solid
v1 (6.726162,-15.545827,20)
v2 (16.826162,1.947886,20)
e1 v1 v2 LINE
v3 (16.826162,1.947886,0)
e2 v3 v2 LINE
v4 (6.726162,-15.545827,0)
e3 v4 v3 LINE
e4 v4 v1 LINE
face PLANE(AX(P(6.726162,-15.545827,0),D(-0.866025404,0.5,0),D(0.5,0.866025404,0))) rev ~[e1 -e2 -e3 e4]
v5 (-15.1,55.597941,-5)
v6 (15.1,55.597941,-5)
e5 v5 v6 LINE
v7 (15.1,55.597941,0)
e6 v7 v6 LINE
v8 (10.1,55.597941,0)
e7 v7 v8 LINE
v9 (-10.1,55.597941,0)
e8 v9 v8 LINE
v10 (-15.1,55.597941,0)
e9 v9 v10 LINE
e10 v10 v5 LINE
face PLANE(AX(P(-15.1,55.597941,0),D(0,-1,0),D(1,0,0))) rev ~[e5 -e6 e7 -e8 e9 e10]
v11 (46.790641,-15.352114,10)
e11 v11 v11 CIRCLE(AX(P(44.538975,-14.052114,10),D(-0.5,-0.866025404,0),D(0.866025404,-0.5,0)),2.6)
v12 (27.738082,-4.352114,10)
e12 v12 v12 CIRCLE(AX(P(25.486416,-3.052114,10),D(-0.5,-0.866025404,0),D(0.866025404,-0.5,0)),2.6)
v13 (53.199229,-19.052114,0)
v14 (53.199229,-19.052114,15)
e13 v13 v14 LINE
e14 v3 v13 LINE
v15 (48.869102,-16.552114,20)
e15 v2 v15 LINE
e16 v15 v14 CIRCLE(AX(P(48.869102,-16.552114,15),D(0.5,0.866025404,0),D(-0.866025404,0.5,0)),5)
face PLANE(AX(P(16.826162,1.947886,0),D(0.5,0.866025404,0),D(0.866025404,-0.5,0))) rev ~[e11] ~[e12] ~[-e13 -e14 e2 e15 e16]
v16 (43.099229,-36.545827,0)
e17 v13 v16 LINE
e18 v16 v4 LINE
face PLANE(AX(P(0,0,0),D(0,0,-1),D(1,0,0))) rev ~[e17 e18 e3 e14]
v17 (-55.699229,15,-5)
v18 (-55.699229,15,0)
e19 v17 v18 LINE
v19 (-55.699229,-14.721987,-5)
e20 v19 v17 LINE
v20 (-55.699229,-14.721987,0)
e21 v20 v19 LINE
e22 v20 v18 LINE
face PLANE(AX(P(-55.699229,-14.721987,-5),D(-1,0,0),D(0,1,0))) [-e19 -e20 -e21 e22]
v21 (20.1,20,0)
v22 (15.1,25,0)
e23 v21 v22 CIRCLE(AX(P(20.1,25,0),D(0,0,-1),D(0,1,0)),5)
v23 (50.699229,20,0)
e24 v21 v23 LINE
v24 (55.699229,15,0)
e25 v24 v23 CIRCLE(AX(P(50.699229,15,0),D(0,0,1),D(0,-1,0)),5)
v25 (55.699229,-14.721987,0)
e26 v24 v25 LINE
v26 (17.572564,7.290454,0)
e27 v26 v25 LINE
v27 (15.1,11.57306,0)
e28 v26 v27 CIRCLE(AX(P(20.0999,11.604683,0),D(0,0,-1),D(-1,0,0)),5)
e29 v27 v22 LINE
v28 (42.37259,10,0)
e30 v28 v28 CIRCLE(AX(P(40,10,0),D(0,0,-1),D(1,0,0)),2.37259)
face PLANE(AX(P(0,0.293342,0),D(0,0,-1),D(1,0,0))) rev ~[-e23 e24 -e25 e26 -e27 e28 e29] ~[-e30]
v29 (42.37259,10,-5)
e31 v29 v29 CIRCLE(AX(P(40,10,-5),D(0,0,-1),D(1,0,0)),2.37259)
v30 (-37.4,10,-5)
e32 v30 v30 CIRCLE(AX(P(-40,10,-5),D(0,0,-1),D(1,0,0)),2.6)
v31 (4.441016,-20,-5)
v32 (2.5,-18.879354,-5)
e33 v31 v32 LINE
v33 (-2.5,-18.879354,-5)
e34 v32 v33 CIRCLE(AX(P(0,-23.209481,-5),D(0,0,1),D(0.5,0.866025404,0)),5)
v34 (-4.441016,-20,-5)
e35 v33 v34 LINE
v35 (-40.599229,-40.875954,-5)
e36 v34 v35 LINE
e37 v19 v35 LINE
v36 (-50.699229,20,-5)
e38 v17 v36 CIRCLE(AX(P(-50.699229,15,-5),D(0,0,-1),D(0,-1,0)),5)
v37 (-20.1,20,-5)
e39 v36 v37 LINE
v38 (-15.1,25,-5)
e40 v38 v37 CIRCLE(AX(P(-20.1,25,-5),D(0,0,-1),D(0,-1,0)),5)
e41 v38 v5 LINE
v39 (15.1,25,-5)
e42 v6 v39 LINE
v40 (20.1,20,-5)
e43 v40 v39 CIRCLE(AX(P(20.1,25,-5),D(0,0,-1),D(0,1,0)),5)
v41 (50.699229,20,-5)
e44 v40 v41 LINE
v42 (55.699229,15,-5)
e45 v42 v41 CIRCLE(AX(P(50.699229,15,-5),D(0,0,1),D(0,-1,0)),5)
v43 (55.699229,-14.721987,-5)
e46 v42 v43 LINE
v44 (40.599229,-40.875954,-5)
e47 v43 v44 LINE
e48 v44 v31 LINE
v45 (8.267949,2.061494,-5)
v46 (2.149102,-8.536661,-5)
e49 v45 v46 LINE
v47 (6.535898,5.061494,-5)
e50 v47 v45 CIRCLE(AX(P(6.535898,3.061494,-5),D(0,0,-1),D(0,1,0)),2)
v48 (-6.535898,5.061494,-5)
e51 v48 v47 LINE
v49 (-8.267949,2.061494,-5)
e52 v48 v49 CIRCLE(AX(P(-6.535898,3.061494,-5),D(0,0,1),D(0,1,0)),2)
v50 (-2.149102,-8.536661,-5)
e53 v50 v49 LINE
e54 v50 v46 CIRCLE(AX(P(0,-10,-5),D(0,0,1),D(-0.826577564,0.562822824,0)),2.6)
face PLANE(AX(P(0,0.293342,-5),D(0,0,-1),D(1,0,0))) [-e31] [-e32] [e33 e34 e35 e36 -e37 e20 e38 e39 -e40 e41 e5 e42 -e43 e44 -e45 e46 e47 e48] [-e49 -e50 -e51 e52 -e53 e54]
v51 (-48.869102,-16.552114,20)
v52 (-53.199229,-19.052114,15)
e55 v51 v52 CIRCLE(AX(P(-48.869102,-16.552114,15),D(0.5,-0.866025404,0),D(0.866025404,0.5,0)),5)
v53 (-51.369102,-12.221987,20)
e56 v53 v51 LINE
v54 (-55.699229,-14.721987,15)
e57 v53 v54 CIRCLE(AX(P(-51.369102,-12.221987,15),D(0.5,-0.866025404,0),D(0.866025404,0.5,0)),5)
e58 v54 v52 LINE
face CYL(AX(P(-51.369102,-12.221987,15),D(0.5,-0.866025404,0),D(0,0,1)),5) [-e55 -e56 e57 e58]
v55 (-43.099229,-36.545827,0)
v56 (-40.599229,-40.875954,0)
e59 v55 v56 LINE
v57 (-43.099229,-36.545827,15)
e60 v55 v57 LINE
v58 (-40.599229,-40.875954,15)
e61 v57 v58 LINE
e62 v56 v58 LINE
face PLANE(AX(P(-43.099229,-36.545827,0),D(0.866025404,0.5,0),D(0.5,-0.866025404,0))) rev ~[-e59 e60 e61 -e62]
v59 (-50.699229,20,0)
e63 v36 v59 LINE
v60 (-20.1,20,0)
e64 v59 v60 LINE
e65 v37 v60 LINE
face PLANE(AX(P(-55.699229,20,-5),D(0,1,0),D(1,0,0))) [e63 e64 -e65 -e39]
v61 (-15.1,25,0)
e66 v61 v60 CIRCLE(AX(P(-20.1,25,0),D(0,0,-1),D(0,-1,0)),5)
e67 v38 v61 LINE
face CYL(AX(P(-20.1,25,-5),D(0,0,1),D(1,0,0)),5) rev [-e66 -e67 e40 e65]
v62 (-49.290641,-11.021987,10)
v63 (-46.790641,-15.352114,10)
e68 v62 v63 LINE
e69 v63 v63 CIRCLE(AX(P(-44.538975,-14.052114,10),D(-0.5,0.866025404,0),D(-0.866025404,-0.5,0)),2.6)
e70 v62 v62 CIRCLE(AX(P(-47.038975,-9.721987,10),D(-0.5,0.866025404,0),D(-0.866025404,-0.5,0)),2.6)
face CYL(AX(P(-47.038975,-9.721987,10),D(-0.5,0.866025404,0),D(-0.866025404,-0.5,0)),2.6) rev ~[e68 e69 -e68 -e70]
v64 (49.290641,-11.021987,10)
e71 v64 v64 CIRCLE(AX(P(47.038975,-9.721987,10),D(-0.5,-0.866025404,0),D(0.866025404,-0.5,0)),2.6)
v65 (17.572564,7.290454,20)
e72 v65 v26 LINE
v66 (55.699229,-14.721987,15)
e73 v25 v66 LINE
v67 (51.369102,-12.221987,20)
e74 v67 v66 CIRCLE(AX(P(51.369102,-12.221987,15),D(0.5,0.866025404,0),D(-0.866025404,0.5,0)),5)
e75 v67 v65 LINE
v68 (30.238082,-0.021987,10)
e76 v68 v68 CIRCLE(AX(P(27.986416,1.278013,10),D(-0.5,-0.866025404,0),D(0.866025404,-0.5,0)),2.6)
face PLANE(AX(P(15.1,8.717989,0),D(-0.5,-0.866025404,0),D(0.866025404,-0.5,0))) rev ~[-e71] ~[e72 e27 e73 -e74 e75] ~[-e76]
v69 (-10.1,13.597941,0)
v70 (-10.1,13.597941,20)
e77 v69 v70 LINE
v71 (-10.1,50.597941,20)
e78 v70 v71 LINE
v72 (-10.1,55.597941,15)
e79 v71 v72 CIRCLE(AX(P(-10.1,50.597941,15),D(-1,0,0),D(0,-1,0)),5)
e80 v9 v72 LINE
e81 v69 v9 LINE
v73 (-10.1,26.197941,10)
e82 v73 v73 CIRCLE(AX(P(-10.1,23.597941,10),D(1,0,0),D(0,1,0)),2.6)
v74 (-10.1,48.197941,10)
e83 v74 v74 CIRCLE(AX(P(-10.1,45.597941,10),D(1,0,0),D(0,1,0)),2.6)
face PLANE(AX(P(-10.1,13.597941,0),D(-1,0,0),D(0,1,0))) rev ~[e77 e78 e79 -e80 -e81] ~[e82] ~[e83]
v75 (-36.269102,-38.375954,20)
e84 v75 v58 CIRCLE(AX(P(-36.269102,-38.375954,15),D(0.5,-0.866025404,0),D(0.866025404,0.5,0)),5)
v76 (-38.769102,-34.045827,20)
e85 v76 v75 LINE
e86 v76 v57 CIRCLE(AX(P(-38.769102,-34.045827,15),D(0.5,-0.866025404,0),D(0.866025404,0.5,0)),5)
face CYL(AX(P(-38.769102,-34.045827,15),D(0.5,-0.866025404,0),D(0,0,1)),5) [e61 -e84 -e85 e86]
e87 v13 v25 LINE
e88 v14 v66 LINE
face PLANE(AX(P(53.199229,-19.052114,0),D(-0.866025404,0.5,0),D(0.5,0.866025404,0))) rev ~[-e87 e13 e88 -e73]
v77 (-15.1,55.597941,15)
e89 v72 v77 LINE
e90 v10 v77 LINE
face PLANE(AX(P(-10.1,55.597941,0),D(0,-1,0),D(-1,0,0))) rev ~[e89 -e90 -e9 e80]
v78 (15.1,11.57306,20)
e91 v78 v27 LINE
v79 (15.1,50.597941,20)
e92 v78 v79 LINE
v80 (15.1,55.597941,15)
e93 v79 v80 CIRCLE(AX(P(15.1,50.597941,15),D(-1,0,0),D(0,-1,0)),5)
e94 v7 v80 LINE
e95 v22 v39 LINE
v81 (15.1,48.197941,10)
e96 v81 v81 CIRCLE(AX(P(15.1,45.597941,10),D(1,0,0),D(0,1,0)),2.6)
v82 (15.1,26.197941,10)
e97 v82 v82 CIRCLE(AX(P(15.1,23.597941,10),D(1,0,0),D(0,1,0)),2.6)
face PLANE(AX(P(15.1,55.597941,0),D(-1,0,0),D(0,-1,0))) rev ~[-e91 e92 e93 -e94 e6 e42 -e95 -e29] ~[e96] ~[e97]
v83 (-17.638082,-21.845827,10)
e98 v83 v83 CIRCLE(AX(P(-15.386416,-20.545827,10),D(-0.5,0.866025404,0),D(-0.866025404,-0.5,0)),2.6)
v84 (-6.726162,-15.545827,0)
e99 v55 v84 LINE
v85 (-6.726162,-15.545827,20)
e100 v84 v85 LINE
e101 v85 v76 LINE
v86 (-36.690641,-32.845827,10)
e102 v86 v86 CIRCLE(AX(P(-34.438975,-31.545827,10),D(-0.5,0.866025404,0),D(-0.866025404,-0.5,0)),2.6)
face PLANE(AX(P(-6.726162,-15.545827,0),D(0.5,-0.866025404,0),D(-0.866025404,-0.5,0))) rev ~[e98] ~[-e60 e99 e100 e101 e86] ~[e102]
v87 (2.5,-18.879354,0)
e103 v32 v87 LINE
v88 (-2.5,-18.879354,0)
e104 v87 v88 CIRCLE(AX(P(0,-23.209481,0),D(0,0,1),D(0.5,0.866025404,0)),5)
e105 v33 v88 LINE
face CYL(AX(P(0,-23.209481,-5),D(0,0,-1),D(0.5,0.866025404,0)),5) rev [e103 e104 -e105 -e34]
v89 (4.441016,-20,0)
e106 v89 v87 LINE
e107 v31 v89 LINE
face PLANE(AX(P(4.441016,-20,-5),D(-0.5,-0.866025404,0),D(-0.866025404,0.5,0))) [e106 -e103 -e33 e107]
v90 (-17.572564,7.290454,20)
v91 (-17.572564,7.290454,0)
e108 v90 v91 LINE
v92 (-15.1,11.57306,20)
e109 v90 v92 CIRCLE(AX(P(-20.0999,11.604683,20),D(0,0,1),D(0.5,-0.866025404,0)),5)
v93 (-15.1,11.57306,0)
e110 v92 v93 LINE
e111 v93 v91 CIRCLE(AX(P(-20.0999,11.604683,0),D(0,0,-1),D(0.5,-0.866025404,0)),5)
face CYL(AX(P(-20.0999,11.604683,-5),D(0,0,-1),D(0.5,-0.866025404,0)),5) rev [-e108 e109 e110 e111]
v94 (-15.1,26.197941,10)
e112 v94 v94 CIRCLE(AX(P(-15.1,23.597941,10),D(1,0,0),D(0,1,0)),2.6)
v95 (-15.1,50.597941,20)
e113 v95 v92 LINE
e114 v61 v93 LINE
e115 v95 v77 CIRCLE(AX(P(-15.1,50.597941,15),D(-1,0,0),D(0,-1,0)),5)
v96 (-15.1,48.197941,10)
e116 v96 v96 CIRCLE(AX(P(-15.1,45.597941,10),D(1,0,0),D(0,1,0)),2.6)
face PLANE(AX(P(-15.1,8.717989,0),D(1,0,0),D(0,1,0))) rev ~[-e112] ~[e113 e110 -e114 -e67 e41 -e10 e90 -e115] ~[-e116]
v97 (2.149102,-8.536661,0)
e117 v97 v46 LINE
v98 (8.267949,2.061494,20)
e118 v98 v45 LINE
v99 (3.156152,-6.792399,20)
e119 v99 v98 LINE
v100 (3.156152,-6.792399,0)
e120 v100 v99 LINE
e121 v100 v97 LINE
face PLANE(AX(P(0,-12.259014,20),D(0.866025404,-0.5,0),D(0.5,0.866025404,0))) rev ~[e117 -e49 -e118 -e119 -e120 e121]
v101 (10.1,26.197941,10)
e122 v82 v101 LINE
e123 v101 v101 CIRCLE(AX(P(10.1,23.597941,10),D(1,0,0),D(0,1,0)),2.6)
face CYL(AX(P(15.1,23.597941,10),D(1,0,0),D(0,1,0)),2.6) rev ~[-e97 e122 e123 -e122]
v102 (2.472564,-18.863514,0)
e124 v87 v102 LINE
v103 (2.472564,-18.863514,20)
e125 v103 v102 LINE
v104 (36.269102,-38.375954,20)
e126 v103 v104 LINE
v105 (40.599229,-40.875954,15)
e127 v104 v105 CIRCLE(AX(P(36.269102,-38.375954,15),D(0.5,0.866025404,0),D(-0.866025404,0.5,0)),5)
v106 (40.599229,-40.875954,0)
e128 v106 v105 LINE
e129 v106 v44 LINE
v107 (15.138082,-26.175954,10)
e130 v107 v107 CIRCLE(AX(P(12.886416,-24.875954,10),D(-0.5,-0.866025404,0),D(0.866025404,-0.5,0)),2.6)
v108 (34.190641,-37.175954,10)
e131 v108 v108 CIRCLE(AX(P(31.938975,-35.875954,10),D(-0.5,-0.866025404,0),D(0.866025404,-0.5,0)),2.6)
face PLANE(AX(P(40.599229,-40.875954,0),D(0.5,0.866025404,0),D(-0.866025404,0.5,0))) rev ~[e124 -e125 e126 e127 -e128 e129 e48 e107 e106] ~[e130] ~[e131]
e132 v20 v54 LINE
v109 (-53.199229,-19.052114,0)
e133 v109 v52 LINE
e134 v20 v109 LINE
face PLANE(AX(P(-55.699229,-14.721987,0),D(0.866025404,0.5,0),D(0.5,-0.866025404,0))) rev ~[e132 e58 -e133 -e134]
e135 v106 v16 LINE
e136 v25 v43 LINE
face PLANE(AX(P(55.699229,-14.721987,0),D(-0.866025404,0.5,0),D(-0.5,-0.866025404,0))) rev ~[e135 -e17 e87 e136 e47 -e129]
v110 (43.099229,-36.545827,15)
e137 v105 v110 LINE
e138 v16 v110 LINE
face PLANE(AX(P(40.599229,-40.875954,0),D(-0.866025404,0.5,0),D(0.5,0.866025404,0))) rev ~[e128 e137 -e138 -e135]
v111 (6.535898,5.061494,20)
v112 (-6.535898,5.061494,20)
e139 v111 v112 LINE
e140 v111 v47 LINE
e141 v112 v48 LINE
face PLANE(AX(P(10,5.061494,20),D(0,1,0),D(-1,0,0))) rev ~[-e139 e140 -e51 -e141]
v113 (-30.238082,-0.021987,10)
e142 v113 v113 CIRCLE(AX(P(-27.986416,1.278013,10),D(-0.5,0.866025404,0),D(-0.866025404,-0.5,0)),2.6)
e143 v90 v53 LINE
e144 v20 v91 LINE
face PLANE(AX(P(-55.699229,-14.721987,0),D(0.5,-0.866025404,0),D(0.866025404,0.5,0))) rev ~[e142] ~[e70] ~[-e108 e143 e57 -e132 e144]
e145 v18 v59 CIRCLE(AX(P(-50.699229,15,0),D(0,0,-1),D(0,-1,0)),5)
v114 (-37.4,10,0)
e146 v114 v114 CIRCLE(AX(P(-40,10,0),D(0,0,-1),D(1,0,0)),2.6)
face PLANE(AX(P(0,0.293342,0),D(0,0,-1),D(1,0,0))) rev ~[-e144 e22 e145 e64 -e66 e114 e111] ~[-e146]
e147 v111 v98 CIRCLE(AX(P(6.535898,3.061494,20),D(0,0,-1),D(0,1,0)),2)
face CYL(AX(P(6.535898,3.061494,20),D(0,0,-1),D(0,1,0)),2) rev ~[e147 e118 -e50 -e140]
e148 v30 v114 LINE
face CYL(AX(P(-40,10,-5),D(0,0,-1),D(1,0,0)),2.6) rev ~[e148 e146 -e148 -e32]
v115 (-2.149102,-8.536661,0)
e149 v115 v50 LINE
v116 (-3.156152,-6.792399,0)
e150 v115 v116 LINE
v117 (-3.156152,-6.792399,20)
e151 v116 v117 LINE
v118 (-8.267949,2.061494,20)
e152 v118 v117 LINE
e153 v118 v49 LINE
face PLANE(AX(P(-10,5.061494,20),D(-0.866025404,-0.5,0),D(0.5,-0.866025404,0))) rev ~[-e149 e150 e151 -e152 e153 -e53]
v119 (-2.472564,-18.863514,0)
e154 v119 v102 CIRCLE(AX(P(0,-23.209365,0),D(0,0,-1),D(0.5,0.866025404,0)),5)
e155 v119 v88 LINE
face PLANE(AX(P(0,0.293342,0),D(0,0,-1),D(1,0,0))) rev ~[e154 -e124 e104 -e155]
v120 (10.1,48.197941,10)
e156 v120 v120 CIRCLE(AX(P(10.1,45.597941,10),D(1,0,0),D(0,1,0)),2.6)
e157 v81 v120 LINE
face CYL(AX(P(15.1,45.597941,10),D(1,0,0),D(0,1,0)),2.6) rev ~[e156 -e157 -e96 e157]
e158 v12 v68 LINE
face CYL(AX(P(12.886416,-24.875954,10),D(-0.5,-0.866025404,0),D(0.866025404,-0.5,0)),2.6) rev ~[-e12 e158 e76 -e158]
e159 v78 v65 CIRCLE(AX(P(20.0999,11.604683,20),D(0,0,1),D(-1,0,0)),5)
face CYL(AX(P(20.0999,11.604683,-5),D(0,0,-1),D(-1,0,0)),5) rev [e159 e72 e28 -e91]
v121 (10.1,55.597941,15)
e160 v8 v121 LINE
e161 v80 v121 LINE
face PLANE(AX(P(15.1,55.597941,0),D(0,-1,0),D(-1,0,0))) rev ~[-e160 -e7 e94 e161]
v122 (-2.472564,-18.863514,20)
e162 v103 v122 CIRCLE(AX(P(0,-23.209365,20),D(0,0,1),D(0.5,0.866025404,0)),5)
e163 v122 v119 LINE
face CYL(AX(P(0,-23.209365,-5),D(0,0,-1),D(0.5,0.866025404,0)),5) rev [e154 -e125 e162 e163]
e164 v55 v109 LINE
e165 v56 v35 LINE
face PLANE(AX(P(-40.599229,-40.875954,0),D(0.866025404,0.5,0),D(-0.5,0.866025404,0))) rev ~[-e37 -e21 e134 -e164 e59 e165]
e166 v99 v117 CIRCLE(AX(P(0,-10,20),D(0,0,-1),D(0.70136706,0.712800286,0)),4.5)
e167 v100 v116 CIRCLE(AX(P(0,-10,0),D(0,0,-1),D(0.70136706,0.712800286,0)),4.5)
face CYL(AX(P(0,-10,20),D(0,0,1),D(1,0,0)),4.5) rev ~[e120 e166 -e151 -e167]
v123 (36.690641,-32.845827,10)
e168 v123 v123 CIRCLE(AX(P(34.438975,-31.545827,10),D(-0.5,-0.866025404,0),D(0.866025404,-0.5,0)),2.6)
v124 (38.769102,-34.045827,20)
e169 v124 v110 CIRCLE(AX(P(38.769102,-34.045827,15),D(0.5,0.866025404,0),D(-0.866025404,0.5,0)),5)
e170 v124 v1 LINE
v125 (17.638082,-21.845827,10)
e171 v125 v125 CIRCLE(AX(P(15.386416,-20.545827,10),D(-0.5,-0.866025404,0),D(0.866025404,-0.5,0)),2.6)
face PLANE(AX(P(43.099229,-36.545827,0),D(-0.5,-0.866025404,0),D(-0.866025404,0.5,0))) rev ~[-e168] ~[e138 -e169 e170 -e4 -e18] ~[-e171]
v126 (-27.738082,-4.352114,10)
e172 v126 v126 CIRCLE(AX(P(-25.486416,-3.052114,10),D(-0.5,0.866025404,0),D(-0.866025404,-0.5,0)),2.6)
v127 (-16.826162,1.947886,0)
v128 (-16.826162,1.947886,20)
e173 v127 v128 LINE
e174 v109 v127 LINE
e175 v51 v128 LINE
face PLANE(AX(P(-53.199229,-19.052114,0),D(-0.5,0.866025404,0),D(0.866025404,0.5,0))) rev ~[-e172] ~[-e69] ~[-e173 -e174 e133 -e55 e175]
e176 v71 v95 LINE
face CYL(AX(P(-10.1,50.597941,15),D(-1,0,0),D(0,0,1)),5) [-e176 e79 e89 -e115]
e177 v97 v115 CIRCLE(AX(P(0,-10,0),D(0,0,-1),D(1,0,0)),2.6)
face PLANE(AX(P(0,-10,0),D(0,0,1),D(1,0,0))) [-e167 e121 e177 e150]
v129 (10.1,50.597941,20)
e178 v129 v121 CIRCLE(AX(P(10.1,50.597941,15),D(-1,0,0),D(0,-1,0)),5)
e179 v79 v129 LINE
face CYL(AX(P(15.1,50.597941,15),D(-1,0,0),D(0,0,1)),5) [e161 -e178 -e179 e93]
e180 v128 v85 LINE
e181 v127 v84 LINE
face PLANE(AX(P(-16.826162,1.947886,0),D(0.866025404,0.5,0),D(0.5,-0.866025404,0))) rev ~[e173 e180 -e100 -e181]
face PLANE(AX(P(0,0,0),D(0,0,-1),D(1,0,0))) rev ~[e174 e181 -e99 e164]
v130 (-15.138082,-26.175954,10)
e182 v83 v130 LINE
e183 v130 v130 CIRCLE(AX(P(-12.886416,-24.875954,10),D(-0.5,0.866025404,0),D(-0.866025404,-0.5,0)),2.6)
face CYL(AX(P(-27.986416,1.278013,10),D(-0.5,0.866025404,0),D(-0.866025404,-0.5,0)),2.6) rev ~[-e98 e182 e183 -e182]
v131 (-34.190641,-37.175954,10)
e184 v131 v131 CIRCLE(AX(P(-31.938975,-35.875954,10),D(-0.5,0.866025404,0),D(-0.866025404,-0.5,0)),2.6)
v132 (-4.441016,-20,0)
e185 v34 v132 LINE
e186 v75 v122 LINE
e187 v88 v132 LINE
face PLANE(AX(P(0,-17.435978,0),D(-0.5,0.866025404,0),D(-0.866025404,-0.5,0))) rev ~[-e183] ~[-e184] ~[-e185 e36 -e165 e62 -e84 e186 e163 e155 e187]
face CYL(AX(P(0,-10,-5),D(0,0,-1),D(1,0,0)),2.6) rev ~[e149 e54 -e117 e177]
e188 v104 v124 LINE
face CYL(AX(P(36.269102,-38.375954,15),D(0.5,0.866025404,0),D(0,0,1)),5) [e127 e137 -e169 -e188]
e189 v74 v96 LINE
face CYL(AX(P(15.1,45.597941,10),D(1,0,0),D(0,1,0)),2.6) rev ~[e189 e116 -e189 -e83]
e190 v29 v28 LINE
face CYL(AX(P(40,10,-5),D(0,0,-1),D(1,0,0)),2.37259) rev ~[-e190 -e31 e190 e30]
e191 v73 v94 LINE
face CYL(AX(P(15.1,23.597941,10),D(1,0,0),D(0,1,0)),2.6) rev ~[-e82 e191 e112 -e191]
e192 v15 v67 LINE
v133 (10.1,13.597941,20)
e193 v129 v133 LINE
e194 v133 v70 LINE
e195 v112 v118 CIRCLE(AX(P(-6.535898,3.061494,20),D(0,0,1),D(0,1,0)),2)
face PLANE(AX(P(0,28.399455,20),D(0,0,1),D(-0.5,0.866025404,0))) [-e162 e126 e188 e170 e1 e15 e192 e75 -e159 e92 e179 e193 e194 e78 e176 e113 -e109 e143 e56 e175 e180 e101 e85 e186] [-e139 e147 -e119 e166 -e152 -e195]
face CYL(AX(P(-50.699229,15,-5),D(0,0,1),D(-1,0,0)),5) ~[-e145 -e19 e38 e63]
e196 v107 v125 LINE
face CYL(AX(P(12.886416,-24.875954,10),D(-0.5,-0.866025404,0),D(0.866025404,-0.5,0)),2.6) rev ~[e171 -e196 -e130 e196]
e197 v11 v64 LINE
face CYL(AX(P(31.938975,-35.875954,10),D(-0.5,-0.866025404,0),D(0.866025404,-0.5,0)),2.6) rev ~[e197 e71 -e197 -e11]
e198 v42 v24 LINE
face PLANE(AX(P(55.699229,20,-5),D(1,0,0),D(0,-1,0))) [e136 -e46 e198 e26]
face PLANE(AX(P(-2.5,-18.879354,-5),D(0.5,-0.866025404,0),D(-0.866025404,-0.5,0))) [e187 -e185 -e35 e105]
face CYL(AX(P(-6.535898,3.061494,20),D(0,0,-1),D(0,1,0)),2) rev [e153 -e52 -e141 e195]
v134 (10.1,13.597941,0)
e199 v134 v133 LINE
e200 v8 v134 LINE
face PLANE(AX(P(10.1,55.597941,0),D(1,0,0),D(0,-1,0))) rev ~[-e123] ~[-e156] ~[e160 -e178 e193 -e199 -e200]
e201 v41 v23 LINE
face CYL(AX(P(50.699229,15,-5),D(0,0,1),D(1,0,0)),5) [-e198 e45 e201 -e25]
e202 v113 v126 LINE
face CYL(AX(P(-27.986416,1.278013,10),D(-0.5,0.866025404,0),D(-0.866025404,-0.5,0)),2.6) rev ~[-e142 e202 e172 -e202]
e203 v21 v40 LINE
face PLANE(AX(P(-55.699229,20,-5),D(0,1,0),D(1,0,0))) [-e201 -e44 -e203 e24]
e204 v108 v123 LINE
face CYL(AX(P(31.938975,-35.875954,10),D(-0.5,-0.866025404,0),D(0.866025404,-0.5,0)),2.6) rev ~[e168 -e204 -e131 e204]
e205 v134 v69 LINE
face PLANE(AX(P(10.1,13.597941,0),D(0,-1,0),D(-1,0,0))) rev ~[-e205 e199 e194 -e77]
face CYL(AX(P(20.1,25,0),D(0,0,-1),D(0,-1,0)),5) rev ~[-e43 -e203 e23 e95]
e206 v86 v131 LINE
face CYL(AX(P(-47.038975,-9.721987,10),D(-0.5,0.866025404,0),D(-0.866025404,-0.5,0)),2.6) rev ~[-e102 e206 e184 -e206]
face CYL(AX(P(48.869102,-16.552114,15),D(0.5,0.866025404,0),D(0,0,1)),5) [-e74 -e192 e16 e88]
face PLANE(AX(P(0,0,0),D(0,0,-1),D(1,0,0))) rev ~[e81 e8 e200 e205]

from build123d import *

# Parameters (mm, degrees)
F1_DEPTH    = 20
F2_R        = 2.6
F3_DEPTH    = 50.6016350946
F4_COUNT    = 3
F4_ANGLE    = 240
F6_DEPTH    = 5
F7_T1_DEPTH = 25
F10_DEPTH   = 5
F11_DEPTH   = 25.001
F12_R       = 2
F13_R       = 2.6
F13_R_2     = 2.372590354
F14_DEPTH   = 25.001
F15_R       = 5
F16_R       = 4.5
F17_DEPTH   = 20


# Not quite as in the source:
# - a fillet or chamfer that OpenCascade refuses, or shapes differently, is made with other operations: its cross-section is extruded or revolved along the edge and cut away or added


with BuildPart() as f1:
    # F0 (on Top) → F1 (new body)
    with BuildSketch(Plane.XY):
        Polygon((43.0992290895, -36.5458269543), (6.7261621305, -15.5458269543), (16.8261621305, 1.9478862021), (53.1992290895, -19.0521137979), (55.6992290895, -14.7219867789), (14.8979589003, 8.8346375481), (0, 0), (-0.2020410997, -17.3193296462), (40.5992290895, -40.8759539732), align=None)
    extrude(amount=F1_DEPTH)

    # F2 (on face) → F3 (cut, through all)
    with BuildSketch(Plane(origin=(-7.55, -13.0769835971, 0), x_dir=(0.8660254038, -0.5, 0), z_dir=(-0.5, -0.8660254038, 0))):
        with Locations((45.5979407522, 10)):
            Circle(F2_R)
        with Locations((23.5979407522, 10)):
            Circle(F2_R)
    extrude(amount=-F3_DEPTH, mode=Mode.SUBTRACT)

    # F4: F1 ×3 about axis
    f4_axis = Axis((0, 0, 10), (0, 0, -1))


with BuildPart() as f1_1:
    add(f1.part)
    for i in range(1, F4_COUNT):
        add(f1.part.rotate(f4_axis, i * F4_ANGLE / (F4_COUNT - 1)))

    # F5 (on face) → F6 (join)
    with BuildSketch(Plane(origin=(0, 0, 0), x_dir=(1, 0, 0), z_dir=(0, 0, -1))):
        Polygon((0, 17.4359781295), (-40.5992290895, 40.8759539732), (-55.6992290895, 14.7219867789), (-15.1, -8.7179890648), (-15.1, -55.5979407522), (15.1, -55.5979407522), (15.1, -8.7179890648), (55.6992290895, 14.7219867789), (40.5992290895, 40.8759539732), align=None)
    extrude(amount=F6_DEPTH)

    # F7: fillet of radius 5 on 3 edges, made by hand

    # F7_s2 → F7_t1 (join)
    with BuildSketch(Plane.XY.offset(-5)):
        with BuildLine():
            ThreePointArc((2.5, -18.8792383324), (0, -18.2093653514), (-2.5, -18.8792383324))
            Line((-2.5, -18.8792383324), (-2.55, -18.7926357921))
            ThreePointArc((-2.55, -18.7926357921), (-1.299975, -18.0710489919), (-0.05, -17.3493755891))
            Line((-0.05, -17.3493755891), (0.05, -17.3493755891))
            ThreePointArc((0.05, -17.3493755891), (1.299975, -18.0710489919), (2.55, -18.7926357921))
            Line((2.55, -18.7926357921), (2.5, -18.8792383324))
        make_face()
        with BuildLine():
            ThreePointArc((15.0999, 11.6046826757), (15.7697729811, 9.1046826757), (17.5999, 7.2745556568))
            Line((17.5999, 7.2745556568), (17.5499, 7.1879531164))
            ThreePointArc((17.5499, 7.1879531164), (16.299975, 7.9097131217), (15.05, 8.6313865244))
            Line((15.05, 8.6313865244), (15, 8.7179890648))
            ThreePointArc((15, 8.7179890648), (15, 10.1613358702), (14.9999, 11.6046826757))
            Line((14.9999, 11.6046826757), (15.0999, 11.6046826757))
        make_face()
        with BuildLine():
            ThreePointArc((-17.5999, 7.2745556568), (-15.7697729811, 9.1046826757), (-15.0999, 11.6046826757))
            Line((-15.0999, 11.6046826757), (-14.9999, 11.6046826757))
            ThreePointArc((-14.9999, 11.6046826757), (-15, 10.1613358702), (-15, 8.7179890648))
            Line((-15, 8.7179890648), (-15.05, 8.6313865244))
            ThreePointArc((-15.05, 8.6313865244), (-16.299975, 7.9097131217), (-17.5499, 7.1879531164))
            Line((-17.5499, 7.1879531164), (-17.5999, 7.2745556568))
        make_face()
    extrude(amount=F7_T1_DEPTH)

    # F9 (on face) → F10 (join)
    with BuildSketch(Plane(origin=(0, 0, -5), x_dir=(1, 0, 0), z_dir=(0, 0, -1))):
        with BuildLine():
            Line((-55.6992290895, 14.7219867789), (-55.6992290895, -20))
            Line((-55.6992290895, -20), (55.6992290895, -20))
            Line((55.6992290895, -20), (55.6992290895, 14.7219867789))
            Line((55.6992290895, 14.7219867789), (52.6519667355, 20))
            Line((52.6519667355, 20), (4.4410161514, 20))
            Line((4.4410161514, 20), (2.5, 18.8793538025))
            ThreePointArc((2.5, 18.8793538025), (0, 18.2094808214), (-2.5, 18.8793538025))
            Line((-2.5, 18.8793538025), (-4.4410161514, 20))
            Line((-4.4410161514, 20), (-52.6519667355, 20))
            Line((-52.6519667355, 20), (-55.6992290895, 14.7219867789))
        make_face()
    extrude(amount=-F10_DEPTH)

    # F8 (on face) → F11 (cut, through all)
    with BuildSketch(Plane.XY.offset(20)):
        Polygon((10, 5.0614941438), (-10, 5.0614941438), (0, -12.2590139319), align=None)
    extrude(amount=-F11_DEPTH, mode=Mode.SUBTRACT)

    # F12
    f12_edges = [f1_1.edges().sort_by_distance(p)[0] for p in [
        (10, 5.061494, 7.5),
        (-10, 5.061494, 7.5),
        (0, -12.259014, 7.5),
    ]]
    fillet(f12_edges, radius=F12_R)

    # F13 (on face) → F14 (cut, through all)
    with BuildSketch(Plane(origin=(0, 0, -5), x_dir=(1, 0, 0), z_dir=(0, 0, -1))):
        with Locations((-40, -10)):
            Circle(F13_R)
        with Locations((40, -10)):
            Circle(F13_R_2)
        with Locations((0, 10)):
            Circle(F13_R)
    extrude(amount=-F14_DEPTH, mode=Mode.SUBTRACT)

    # F15
    f15_edges = [f1_1.edges().sort_by_distance(p)[0] for p in [
        (-15.1, 20, -2.5),
        (15.1, 20, -2.5),
        (55.699229, 20, -2.5),
        (-55.699229, 20, -2.5),
        (-12.6, 55.597941, 20),
        (12.6, 55.597941, 20),
        (-54.449229, -16.88705, 20),
        (-41.849229, -38.71089, 20),
        (54.449229, -16.88705, 20),
        (41.849229, -38.71089, 20),
    ]]
    fillet(f15_edges, radius=F15_R)

    # F16 (on face) → F17 (cut)
    with BuildSketch(Plane.XY.offset(20)):
        with Locations((0, -10)):
            Circle(F16_R)
    extrude(amount=-F17_DEPTH, mode=Mode.SUBTRACT)


solid = f1_1.part
